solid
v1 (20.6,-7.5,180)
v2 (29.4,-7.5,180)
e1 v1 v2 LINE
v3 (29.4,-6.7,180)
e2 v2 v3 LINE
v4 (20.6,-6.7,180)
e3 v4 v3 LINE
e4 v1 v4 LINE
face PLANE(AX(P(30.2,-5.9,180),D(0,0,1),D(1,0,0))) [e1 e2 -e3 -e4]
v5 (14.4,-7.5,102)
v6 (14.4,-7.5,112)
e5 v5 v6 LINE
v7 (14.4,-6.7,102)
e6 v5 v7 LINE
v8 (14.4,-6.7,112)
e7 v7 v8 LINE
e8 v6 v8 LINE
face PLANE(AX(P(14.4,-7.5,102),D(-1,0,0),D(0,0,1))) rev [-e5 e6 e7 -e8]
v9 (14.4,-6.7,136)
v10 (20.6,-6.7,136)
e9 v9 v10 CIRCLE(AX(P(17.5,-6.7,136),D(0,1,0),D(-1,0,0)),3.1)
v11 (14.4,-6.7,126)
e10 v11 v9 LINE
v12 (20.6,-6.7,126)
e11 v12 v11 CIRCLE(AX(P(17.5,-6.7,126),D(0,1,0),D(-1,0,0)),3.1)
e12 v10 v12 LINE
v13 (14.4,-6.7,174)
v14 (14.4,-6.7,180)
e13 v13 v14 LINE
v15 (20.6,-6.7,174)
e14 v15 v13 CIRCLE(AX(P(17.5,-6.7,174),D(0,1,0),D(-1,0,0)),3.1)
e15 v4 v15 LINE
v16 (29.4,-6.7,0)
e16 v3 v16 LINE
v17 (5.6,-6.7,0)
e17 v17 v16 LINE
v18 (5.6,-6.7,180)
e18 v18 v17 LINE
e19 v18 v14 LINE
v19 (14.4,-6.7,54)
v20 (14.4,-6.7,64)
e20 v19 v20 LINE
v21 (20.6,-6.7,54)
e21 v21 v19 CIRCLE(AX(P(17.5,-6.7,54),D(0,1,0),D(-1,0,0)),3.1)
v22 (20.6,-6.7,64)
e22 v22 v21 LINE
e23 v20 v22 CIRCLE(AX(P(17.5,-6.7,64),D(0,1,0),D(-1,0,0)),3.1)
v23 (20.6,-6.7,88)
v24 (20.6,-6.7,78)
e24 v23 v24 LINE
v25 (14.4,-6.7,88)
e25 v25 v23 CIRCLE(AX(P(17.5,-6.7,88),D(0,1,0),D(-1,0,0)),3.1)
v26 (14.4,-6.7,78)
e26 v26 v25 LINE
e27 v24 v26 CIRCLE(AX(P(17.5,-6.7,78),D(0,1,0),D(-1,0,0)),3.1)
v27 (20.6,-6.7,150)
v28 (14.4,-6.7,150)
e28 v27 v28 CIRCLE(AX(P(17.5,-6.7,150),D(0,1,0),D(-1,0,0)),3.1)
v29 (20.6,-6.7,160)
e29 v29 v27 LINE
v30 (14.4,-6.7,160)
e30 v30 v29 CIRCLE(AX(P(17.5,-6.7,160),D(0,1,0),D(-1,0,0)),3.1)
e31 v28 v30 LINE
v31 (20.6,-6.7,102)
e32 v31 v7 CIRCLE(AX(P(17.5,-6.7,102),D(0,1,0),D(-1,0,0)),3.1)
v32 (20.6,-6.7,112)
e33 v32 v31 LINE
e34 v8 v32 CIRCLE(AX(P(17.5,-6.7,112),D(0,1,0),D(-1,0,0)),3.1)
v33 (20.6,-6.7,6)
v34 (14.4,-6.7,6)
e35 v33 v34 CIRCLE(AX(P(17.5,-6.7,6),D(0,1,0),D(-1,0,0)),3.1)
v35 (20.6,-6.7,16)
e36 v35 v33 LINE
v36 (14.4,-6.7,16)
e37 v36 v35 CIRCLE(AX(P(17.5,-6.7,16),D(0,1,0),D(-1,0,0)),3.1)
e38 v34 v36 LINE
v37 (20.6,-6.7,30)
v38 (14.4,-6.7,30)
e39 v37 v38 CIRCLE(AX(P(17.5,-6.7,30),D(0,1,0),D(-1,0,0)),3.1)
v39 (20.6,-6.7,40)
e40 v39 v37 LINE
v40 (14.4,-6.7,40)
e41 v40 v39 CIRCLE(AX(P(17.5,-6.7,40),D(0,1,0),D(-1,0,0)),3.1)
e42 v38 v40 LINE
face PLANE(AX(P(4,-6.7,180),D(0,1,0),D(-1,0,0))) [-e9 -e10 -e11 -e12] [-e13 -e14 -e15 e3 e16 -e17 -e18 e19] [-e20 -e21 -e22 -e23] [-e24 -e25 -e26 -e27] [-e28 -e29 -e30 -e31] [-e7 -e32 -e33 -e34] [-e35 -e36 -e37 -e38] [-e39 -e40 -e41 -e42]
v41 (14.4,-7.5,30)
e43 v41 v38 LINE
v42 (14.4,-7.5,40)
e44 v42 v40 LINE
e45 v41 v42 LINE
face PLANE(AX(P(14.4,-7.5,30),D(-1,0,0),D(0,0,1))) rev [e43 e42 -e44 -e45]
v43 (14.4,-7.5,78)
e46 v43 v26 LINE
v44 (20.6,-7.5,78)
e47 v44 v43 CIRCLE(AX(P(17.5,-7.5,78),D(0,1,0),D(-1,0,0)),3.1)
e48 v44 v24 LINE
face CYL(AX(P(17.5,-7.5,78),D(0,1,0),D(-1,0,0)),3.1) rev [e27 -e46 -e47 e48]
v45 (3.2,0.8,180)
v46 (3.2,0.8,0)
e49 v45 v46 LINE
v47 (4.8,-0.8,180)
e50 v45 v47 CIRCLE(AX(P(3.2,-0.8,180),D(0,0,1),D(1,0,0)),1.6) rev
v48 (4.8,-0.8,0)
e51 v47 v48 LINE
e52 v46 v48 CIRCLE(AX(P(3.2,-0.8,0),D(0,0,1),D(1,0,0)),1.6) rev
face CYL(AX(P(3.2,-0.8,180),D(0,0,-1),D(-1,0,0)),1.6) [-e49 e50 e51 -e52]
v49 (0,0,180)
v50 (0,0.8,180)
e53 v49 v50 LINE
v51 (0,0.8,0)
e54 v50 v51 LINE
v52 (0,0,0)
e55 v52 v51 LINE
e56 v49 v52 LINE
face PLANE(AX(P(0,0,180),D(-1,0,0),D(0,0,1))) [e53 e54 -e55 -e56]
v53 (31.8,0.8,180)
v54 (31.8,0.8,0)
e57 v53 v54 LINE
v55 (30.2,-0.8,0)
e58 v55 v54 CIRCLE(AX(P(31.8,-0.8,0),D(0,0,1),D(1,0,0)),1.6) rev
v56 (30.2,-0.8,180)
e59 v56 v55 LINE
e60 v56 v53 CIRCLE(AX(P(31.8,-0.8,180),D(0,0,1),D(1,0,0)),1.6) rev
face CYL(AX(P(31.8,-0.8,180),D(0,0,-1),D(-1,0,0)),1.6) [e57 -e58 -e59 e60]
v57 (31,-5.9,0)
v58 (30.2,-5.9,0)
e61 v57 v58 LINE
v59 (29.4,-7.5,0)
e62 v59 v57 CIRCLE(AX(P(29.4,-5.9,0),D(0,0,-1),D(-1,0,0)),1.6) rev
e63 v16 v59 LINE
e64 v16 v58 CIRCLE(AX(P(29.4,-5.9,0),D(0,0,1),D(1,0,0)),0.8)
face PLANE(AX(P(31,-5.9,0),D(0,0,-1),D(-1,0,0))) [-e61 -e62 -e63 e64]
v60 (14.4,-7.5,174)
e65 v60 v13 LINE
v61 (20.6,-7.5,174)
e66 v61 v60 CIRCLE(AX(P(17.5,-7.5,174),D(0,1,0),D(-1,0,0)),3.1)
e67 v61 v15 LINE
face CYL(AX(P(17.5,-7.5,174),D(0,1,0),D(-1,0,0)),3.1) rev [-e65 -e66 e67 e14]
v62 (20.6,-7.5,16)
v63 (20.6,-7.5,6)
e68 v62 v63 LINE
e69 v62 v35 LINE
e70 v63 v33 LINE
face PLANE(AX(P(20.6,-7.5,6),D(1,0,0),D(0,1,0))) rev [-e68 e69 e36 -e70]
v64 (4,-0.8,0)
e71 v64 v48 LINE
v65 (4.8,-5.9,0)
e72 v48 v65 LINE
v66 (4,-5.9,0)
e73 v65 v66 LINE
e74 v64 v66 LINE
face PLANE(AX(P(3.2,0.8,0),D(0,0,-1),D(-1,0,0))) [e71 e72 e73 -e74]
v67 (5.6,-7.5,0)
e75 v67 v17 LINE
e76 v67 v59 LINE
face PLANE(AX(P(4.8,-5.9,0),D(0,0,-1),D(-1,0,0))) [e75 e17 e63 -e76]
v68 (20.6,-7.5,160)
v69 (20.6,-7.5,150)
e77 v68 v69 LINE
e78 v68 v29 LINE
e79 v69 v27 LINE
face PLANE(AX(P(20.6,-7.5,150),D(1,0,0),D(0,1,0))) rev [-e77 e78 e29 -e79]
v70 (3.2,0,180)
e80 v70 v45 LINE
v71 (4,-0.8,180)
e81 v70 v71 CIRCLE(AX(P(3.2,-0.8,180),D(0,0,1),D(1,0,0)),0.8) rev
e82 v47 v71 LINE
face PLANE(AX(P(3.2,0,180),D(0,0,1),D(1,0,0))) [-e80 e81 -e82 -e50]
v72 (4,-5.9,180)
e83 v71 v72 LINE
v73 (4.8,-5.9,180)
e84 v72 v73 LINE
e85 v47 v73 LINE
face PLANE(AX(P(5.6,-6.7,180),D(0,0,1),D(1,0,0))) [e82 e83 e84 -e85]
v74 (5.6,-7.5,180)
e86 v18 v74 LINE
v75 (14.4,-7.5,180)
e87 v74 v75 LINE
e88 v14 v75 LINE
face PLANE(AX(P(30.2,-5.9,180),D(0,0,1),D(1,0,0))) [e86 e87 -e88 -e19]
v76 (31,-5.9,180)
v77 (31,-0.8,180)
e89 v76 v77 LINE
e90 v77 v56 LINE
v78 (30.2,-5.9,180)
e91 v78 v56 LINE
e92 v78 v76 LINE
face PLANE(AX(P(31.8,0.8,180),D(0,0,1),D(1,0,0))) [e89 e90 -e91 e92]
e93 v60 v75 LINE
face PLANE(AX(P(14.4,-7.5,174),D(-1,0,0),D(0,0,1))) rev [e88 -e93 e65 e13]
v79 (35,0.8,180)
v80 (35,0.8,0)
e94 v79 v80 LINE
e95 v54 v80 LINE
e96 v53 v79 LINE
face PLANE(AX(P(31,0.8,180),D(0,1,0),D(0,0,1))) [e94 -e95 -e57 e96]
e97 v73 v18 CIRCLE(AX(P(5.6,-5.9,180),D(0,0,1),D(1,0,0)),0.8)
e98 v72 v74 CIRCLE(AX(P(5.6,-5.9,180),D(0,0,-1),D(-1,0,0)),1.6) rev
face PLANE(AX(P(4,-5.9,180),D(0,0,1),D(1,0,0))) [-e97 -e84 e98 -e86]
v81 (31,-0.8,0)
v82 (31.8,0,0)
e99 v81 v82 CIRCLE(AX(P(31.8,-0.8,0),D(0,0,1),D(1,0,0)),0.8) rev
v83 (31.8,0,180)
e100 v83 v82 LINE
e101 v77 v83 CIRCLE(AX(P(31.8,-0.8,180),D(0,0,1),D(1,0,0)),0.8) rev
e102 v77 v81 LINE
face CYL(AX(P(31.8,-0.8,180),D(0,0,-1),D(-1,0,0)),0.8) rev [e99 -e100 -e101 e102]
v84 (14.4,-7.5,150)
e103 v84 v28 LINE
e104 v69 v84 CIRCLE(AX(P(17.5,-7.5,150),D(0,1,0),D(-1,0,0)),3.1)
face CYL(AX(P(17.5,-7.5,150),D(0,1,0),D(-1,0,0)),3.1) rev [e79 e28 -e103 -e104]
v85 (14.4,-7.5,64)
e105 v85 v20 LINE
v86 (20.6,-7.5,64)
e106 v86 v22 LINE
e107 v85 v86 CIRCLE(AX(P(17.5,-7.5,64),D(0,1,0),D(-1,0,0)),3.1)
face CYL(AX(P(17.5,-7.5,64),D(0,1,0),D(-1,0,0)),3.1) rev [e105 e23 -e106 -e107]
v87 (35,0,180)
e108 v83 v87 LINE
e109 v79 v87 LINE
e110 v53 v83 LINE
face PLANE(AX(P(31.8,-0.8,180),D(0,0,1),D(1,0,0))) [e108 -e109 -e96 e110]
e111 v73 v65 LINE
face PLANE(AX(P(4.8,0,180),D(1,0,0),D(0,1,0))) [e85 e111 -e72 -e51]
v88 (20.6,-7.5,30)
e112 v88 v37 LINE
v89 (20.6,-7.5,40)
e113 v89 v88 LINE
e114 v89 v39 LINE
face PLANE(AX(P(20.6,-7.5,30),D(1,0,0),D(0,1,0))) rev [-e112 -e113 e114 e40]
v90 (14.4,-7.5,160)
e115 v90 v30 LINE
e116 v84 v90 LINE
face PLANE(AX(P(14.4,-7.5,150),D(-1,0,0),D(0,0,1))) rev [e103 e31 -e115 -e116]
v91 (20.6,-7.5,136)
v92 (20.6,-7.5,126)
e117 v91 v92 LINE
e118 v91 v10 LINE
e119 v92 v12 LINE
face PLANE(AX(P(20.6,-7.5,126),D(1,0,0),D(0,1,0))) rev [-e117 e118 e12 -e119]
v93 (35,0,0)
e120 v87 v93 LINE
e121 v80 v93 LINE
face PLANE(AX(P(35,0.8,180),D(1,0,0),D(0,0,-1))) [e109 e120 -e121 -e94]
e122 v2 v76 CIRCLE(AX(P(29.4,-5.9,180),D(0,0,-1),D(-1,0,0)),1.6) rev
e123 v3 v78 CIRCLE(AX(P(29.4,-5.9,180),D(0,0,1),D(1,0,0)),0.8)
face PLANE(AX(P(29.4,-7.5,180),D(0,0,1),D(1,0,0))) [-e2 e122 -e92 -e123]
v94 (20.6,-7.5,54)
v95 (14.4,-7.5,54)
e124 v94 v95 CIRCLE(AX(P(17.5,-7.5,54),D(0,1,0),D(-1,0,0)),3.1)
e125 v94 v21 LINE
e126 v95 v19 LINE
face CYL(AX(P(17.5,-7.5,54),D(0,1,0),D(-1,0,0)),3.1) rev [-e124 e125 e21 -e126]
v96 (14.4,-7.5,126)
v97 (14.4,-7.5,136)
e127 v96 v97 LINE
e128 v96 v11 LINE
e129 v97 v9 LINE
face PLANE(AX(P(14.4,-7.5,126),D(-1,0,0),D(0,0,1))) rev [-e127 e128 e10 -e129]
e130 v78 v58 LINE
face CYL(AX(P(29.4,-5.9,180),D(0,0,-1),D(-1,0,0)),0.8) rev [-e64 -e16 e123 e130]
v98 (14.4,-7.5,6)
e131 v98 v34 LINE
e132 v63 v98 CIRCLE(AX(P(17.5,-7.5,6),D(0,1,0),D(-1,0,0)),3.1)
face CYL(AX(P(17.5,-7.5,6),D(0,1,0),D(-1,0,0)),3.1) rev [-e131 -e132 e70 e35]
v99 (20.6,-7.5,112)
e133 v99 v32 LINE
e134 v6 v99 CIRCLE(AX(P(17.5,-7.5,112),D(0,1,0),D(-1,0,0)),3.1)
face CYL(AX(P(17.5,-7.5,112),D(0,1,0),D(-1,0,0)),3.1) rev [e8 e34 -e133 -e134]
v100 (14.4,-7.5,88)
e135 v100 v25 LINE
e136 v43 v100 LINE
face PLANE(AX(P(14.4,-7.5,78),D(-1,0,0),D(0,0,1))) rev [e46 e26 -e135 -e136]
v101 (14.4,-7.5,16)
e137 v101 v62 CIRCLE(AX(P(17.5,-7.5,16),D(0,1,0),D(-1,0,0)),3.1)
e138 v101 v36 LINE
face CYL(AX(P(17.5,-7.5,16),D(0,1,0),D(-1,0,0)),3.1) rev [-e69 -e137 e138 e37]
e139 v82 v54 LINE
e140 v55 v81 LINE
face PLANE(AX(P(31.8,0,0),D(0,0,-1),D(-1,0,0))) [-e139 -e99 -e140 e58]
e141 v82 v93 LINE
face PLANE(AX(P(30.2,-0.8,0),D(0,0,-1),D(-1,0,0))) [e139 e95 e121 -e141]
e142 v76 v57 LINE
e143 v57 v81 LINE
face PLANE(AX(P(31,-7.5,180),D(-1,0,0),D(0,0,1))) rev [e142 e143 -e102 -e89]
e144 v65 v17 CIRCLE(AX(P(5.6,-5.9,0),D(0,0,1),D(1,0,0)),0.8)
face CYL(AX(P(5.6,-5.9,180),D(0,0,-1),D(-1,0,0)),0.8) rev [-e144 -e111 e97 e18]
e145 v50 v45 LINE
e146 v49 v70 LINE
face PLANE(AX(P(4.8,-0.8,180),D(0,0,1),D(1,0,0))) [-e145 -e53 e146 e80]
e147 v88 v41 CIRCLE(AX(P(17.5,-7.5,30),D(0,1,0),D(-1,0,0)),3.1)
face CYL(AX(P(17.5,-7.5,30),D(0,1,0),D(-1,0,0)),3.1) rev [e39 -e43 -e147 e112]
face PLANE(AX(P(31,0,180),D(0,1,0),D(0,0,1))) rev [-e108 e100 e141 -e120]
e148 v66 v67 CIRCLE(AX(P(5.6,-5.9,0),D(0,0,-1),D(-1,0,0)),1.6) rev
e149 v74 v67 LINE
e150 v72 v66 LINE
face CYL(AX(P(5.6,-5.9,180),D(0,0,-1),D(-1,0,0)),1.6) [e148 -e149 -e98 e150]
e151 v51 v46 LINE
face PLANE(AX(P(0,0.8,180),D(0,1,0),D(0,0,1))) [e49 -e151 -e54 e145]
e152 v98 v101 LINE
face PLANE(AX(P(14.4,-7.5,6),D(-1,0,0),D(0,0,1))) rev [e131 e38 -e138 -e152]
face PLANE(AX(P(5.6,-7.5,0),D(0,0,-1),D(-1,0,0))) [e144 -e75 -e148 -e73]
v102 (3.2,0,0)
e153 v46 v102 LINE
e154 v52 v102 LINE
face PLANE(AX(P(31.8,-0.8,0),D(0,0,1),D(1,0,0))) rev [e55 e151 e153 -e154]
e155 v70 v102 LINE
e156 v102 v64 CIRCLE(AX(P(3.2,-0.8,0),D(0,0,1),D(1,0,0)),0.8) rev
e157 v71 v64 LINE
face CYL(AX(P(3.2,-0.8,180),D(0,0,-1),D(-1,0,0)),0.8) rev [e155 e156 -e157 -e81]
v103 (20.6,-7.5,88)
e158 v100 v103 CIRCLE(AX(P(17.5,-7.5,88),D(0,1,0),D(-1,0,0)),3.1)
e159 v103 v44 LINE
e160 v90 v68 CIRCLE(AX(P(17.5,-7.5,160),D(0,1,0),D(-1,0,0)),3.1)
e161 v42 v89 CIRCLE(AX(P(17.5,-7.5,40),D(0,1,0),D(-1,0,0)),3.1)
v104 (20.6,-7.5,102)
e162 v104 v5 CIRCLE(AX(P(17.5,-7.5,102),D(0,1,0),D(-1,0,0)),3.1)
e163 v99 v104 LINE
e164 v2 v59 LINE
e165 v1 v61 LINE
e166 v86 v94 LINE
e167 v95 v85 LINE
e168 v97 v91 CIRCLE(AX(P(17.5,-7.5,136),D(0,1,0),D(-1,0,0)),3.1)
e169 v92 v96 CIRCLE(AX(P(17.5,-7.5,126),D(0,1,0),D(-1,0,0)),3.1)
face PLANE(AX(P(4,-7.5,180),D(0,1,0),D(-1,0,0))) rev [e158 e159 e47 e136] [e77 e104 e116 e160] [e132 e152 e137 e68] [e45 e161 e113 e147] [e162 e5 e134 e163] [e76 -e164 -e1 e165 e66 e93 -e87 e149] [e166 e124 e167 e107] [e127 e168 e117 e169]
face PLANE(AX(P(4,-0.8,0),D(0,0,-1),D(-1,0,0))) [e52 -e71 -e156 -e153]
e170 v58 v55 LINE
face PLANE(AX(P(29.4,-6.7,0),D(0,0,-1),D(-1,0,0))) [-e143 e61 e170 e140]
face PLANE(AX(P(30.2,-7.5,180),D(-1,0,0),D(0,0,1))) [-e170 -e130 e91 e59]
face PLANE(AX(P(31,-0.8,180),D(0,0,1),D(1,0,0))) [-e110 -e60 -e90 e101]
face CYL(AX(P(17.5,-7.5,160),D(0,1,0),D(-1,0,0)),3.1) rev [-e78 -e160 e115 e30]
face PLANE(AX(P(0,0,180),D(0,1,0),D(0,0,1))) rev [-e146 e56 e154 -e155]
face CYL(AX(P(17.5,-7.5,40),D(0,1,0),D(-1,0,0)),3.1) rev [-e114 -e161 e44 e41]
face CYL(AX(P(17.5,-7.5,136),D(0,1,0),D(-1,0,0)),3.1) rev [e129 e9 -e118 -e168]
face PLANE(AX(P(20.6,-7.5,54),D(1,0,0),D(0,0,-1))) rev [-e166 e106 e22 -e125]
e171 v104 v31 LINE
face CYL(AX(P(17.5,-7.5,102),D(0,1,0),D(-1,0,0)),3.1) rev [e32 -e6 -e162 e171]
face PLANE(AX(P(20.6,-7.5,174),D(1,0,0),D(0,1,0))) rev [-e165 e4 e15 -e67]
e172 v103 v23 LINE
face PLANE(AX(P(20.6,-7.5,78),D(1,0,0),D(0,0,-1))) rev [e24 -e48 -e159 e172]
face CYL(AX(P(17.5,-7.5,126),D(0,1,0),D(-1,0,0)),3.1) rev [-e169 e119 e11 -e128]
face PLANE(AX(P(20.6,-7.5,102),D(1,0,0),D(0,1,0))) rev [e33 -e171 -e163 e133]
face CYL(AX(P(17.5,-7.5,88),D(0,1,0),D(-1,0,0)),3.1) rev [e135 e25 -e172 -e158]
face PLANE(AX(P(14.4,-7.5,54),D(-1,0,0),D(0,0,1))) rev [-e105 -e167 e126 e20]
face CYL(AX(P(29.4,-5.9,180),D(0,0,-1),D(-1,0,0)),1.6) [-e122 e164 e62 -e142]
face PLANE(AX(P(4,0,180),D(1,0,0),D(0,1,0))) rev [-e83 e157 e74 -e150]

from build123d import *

# Parameters (mm, degrees)
SM_BASE_FLANGE_1_DEPTH = 180
CUT_EXTRUDE_1_DEPTH    = 184.524521522


# Sheet-metal steps are written as plain solids
with BuildPart() as part:
    # Sketch 1 → Базовая кромка1 (new body)
    with BuildSketch(Plane.XY):
        with BuildLine():
            Line((0, 0), (3.2, 0))
            ThreePointArc((3.2, 0), (3.765685425, -0.234314575), (4, -0.8))
            Line((4, -0.8), (4, -5.9))
            ThreePointArc((4, -5.9), (4.46862915, -7.03137085), (5.6, -7.5))
            Line((5.6, -7.5), (29.4, -7.5))
            ThreePointArc((29.4, -7.5), (30.53137085, -7.03137085), (31, -5.9))
            Line((31, -5.9), (31, -0.8))
            ThreePointArc((31, -0.8), (31.234314575, -0.234314575), (31.8, 0))
            Line((31.8, 0), (35, 0))
            Line((35, 0), (35, 0.8))
            Line((35, 0.8), (31.8, 0.8))
            ThreePointArc((31.8, 0.8), (30.66862915, 0.33137085), (30.2, -0.8))
            Line((30.2, -0.8), (30.2, -5.9))
            ThreePointArc((30.2, -5.9), (29.965685425, -6.465685425), (29.4, -6.7))
            Line((29.4, -6.7), (5.6, -6.7))
            ThreePointArc((5.6, -6.7), (5.034314575, -6.465685425), (4.8, -5.9))
            Line((4.8, -5.9), (4.8, -0.8))
            ThreePointArc((4.8, -0.8), (4.33137085, 0.33137085), (3.2, 0.8))
            Line((3.2, 0.8), (0, 0.8))
            Line((0, 0.8), (0, 0))
        make_face()
    extrude(amount=SM_BASE_FLANGE_1_DEPTH)

    # Эскиз6 → Вырез-Вытянуть1 (cut, through all)
    with BuildSketch(Plane(origin=(0, -6.7, 0), x_dir=(1, 0, 0), z_dir=(0, 1, 0))):
        with BuildLine():
            Line((20.6, -6), (20.6, -16))
            ThreePointArc((20.6, -16), (17.5, -19.1), (14.4, -16))
            Line((14.4, -16), (14.4, -6))
            ThreePointArc((14.4, -6), (17.5, -2.9), (20.6, -6))
        make_face()
        with BuildLine():
            Line((20.6, -30), (20.6, -40))
            ThreePointArc((20.6, -40), (17.5, -43.1), (14.4, -40))
            Line((14.4, -40), (14.4, -30))
            ThreePointArc((14.4, -30), (17.5, -26.9), (20.6, -30))
        make_face()
        with BuildLine():
            Line((20.6, -54), (20.6, -64))
            ThreePointArc((20.6, -64), (17.5, -67.1), (14.4, -64))
            Line((14.4, -64), (14.4, -54))
            ThreePointArc((14.4, -54), (17.5, -50.9), (20.6, -54))
        make_face()
        with BuildLine():
            Line((20.6, -78), (20.6, -88))
            ThreePointArc((20.6, -88), (17.5, -91.1), (14.4, -88))
            Line((14.4, -88), (14.4, -78))
            ThreePointArc((14.4, -78), (17.5, -74.9), (20.6, -78))
        make_face()
        with BuildLine():
            Line((20.6, -102), (20.6, -112))
            ThreePointArc((20.6, -112), (17.5, -115.1), (14.4, -112))
            Line((14.4, -112), (14.4, -102))
            ThreePointArc((14.4, -102), (17.5, -98.9), (20.6, -102))
        make_face()
        with BuildLine():
            Line((20.6, -126), (20.6, -136))
            ThreePointArc((20.6, -136), (17.5, -139.1), (14.4, -136))
            Line((14.4, -136), (14.4, -126))
            ThreePointArc((14.4, -126), (17.5, -122.9), (20.6, -126))
        make_face()
        with BuildLine():
            Line((20.6, -150), (20.6, -160))
            ThreePointArc((20.6, -160), (17.5, -163.1), (14.4, -160))
            Line((14.4, -160), (14.4, -150))
            ThreePointArc((14.4, -150), (17.5, -146.9), (20.6, -150))
        make_face()
        with BuildLine():
            Line((20.6, -174), (20.6, -184))
            ThreePointArc((20.6, -184), (17.5, -187.1), (14.4, -184))
            Line((14.4, -184), (14.4, -174))
            ThreePointArc((14.4, -174), (17.5, -170.9), (20.6, -174))
        make_face()
    extrude(amount=-CUT_EXTRUDE_1_DEPTH, mode=Mode.SUBTRACT)


solid = part.part
